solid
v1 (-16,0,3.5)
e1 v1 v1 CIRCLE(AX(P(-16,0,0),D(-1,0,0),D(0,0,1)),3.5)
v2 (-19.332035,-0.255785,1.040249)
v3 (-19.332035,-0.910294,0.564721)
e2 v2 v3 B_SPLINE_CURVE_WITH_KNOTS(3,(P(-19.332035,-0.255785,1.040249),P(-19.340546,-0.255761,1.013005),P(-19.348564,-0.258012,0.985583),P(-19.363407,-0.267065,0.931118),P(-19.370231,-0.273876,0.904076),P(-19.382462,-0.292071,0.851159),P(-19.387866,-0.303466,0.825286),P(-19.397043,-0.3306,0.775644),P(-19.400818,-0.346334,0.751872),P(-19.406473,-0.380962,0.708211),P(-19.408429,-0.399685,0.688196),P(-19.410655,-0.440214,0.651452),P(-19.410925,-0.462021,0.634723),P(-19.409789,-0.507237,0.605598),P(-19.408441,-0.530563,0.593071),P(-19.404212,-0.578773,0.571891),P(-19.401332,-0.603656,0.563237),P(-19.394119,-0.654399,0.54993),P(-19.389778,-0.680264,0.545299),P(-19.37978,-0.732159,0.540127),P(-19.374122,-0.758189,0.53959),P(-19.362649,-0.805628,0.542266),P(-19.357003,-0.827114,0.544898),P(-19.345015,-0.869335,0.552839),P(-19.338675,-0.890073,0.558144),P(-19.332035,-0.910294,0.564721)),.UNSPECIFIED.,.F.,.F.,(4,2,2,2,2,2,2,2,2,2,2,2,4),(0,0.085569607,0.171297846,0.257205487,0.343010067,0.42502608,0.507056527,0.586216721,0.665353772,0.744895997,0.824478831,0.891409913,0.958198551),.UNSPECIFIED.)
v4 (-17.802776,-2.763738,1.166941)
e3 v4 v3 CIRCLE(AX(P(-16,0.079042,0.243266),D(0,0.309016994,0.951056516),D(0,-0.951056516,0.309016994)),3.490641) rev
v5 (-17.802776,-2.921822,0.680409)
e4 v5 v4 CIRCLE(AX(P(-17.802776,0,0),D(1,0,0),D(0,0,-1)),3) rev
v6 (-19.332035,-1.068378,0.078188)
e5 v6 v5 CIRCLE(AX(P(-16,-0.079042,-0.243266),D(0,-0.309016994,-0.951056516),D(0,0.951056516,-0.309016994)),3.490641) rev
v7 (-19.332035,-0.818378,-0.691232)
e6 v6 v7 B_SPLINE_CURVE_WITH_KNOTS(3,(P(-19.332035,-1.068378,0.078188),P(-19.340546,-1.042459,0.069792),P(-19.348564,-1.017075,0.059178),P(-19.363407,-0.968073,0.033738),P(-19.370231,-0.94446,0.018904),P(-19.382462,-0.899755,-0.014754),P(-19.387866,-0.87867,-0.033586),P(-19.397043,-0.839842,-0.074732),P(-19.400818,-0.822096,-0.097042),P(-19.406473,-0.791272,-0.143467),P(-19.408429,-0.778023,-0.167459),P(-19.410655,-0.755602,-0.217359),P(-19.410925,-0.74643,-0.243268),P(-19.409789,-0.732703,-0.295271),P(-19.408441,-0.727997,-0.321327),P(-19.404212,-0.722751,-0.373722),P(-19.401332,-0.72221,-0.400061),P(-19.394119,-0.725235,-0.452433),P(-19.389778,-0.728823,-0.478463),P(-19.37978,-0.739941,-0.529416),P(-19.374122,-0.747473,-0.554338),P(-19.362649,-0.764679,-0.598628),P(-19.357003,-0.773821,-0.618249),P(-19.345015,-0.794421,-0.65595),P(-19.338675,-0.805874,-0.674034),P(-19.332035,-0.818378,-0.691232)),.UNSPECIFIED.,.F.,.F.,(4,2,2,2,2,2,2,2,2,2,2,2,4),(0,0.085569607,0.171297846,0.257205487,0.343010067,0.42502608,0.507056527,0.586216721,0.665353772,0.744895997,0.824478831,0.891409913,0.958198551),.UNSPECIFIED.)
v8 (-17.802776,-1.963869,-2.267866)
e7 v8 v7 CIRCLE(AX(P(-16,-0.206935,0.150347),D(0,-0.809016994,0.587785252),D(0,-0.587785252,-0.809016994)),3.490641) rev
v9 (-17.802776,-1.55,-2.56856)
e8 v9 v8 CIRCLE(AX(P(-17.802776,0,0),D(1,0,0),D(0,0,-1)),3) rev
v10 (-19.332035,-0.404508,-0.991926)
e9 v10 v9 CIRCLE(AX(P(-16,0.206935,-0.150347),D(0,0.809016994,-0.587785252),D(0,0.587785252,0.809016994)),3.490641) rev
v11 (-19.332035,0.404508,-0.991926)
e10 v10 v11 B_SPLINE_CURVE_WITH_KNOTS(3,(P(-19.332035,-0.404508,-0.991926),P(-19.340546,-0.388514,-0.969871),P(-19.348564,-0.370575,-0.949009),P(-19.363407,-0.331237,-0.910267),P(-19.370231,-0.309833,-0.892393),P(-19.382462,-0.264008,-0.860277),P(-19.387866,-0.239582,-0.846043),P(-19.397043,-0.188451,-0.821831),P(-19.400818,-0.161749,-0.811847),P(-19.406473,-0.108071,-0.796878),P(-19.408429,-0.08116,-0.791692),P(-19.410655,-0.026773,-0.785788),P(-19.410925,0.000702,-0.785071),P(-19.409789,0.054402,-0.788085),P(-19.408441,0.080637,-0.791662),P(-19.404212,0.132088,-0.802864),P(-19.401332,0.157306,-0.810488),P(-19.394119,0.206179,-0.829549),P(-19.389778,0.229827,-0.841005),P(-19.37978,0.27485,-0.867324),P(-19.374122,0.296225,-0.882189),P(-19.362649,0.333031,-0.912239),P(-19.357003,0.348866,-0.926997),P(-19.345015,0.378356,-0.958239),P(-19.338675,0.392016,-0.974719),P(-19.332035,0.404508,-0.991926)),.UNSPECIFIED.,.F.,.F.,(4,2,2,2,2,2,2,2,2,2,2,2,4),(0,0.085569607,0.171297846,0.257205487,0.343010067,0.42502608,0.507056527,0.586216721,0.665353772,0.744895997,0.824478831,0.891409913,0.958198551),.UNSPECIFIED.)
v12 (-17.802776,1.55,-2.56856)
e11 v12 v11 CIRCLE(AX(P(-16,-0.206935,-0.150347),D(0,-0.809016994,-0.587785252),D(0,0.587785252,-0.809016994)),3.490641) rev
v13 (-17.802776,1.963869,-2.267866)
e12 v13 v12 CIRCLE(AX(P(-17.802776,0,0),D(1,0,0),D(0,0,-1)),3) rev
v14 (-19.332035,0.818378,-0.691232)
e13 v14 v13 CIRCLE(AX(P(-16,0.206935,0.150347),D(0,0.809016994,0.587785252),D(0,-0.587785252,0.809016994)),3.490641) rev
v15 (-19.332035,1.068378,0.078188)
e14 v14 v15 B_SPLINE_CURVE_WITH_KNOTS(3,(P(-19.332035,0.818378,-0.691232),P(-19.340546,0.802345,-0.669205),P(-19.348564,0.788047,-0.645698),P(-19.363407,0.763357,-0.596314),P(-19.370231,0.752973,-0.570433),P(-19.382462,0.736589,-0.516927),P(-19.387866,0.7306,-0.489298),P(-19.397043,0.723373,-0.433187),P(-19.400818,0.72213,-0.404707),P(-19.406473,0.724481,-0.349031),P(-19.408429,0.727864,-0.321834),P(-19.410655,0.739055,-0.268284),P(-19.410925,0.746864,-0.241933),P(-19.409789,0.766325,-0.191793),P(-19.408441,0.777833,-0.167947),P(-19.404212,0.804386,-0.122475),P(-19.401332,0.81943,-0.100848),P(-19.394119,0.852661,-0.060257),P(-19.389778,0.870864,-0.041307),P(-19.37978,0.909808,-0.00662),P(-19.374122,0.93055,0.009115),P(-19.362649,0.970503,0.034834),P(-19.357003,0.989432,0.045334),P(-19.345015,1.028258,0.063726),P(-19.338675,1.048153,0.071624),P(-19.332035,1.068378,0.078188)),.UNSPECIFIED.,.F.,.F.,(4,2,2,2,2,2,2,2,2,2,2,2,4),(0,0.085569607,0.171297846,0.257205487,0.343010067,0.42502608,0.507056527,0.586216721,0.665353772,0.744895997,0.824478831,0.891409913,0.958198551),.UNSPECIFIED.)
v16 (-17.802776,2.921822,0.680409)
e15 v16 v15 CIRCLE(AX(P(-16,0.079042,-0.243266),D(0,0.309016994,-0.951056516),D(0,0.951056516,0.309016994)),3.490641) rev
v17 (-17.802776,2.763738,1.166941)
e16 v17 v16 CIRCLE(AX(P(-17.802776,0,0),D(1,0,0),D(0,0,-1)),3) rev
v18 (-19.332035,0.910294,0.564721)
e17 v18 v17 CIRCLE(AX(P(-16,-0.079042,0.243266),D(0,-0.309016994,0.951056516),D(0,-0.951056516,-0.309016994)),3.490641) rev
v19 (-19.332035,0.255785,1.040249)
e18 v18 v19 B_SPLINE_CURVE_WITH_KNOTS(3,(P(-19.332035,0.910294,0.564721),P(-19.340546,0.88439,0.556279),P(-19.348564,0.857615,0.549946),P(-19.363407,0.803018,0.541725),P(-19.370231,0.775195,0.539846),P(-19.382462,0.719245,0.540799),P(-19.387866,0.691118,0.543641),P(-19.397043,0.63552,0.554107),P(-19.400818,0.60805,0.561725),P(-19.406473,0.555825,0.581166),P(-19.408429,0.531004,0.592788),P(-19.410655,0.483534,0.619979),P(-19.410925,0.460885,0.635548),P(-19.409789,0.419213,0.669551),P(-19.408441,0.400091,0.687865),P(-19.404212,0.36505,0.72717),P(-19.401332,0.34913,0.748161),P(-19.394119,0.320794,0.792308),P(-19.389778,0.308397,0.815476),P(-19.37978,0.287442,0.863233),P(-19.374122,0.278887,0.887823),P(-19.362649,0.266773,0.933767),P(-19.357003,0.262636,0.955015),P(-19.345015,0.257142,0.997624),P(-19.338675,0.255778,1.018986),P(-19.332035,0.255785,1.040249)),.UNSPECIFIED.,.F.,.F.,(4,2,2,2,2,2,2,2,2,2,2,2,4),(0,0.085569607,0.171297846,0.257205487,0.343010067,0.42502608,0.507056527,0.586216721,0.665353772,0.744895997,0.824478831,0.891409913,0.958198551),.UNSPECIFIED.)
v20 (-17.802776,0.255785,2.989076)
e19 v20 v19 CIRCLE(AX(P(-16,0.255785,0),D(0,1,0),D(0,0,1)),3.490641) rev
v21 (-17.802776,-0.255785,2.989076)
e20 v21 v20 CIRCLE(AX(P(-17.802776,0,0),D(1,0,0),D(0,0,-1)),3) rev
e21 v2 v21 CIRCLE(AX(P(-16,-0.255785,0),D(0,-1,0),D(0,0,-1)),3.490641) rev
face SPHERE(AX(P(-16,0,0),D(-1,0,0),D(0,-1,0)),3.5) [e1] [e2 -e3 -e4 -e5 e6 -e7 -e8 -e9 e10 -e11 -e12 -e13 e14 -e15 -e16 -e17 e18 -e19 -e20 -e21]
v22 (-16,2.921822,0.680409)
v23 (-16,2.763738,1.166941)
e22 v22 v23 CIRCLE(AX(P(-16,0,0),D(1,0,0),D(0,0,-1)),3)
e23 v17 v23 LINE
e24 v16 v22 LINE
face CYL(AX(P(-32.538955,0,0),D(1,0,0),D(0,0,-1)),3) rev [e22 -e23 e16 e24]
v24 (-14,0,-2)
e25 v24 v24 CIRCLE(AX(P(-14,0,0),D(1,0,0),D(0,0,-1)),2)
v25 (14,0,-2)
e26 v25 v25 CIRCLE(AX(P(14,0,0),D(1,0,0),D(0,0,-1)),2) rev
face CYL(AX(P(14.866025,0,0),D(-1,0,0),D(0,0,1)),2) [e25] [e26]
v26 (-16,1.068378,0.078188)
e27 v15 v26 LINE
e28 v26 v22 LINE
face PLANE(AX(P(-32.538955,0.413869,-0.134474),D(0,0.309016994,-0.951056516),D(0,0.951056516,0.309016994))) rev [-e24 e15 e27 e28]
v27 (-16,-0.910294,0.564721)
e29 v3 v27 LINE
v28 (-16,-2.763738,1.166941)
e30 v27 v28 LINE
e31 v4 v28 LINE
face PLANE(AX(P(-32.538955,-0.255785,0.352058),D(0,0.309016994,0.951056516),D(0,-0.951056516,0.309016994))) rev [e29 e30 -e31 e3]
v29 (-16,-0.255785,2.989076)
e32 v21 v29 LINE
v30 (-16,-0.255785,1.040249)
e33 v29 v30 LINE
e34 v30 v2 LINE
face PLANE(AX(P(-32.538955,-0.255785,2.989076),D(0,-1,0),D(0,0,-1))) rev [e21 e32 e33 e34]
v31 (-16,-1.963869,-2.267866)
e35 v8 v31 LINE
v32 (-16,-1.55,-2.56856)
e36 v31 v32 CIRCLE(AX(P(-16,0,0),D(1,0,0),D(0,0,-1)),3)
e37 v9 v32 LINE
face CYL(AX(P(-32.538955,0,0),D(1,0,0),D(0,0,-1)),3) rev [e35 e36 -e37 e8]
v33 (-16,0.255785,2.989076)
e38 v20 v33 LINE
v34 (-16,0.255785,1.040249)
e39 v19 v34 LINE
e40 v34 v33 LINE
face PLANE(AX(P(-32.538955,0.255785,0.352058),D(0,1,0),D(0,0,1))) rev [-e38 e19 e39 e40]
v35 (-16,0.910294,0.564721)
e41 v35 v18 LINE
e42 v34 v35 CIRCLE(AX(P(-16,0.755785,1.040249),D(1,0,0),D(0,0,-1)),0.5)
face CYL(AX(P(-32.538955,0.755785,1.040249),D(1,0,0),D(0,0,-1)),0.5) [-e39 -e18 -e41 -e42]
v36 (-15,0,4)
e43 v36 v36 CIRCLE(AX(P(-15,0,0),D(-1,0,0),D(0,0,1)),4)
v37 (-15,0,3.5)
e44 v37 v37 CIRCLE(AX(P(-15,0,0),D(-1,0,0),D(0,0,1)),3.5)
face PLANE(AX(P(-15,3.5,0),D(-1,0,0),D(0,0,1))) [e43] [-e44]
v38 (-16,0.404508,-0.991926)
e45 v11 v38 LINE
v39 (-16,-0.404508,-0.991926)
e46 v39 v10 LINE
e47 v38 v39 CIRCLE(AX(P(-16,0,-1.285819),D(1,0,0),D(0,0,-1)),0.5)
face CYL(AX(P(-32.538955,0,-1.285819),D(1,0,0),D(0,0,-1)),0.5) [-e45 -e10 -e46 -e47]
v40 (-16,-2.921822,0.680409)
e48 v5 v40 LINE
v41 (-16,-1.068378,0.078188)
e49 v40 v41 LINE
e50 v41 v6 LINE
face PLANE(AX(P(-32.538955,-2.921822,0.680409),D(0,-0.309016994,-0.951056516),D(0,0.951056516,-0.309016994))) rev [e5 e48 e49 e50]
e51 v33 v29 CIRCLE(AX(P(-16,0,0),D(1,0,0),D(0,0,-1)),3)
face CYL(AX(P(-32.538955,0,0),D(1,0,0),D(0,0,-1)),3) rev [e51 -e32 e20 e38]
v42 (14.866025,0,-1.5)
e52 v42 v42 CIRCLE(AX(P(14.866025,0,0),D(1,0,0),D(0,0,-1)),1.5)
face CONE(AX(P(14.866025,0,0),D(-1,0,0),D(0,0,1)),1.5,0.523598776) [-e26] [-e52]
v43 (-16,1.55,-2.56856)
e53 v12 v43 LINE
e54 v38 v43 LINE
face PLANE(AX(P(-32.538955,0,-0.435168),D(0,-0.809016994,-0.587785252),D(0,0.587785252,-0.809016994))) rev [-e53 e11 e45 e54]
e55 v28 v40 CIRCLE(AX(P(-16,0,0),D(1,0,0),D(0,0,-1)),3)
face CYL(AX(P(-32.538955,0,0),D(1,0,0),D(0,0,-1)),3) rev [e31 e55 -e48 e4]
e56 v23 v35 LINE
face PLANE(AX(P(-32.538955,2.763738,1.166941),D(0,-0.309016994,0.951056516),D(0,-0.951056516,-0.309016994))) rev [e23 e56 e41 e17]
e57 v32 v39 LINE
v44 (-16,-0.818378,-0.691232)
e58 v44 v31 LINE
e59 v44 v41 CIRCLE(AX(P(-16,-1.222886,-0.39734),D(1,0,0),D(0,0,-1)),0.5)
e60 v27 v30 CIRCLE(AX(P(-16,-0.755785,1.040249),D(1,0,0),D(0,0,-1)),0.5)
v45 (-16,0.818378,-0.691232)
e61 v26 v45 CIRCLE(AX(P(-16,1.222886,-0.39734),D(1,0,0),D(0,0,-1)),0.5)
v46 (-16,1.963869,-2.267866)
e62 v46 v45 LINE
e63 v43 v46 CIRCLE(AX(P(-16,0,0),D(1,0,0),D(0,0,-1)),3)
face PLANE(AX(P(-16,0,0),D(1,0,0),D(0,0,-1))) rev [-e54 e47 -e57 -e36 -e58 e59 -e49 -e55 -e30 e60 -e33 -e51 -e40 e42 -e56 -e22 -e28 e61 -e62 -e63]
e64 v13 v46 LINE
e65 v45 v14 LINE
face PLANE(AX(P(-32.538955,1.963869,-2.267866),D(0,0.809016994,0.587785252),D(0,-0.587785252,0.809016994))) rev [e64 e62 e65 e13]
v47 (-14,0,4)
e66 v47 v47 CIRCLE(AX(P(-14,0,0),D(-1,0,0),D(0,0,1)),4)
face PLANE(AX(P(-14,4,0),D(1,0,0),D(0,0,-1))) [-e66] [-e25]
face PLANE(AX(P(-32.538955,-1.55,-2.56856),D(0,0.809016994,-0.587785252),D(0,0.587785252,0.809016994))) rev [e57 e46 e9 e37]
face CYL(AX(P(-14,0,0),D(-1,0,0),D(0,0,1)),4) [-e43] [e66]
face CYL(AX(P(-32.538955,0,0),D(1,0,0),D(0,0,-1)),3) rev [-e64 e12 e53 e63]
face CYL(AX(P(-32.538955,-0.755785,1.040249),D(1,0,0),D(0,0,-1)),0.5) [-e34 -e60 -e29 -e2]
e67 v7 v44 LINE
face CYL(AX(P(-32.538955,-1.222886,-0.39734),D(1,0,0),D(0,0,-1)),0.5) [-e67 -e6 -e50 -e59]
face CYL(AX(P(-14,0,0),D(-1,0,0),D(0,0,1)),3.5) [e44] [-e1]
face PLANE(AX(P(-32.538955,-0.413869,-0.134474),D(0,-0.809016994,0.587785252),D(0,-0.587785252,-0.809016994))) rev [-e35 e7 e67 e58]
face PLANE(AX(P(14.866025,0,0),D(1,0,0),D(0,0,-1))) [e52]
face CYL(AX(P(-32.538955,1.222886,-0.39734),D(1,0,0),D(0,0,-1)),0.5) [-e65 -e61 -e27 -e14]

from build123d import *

# Parameters (mm, degrees)
SKETCH2_R               = 2
BOSS_EXTRUDE1_DEPTH     = 28.866025404
CUT_EXTRUDE1_REACH      = 33.38
CUT_EXTRUDE1_END_RADIUS = 3.5
CHAMFER1_SIZE           = 0.5
CHAMFER1_SIZE2          = 0.866025404
FILLET1_R               = 0.5


with BuildPart() as part:
    # Sketch1 → Revolve1 (revolve)
    with BuildSketch(Plane(origin=(0, 0, 0), x_dir=(-1, 0, 0), z_dir=(0, 0, -1)), mode=Mode.PRIVATE) as revolve1_sk:
        with BuildLine():
            Line((14, 4), (14, 0))
            Line((14, 0), (19.5, 0))
            ThreePointArc((19.5, 0), (18.474873734, 2.474873734), (16, 3.5))
            Line((16, 3.5), (15, 3.5))
            Line((15, 3.5), (15, 4))
            Line((15, 4), (14, 4))
        make_face()
    revolve(revolve1_sk.sketch.rotate(Axis((-14, 0, 0), (-1, 0, 0)), 270), axis=Axis((-14, 0, 0), (-1, 0, 0)))

    # Sketch2 → Boss-Extrude1 (add)
    with BuildSketch(Plane(origin=(-14, 0, 0), x_dir=(0, 0, -1), z_dir=(1, 0, 0))):
        Circle(SKETCH2_R)
    extrude(amount=BOSS_EXTRUDE1_DEPTH)

    # Cut-Extrude1: up to this sphere (the profile starts inside it)
    cut_extrude1_end = Location((-16, 0, 0)) * Sphere(CUT_EXTRUDE1_END_RADIUS, mode=Mode.PRIVATE)
    # Sketch3 → Cut-Extrude1 (cut, up to the surface)
    with BuildSketch(Plane(origin=(-16, 0, 0), x_dir=(0, 0, -1), z_dir=(1, 0, 0)), mode=Mode.PRIVATE) as cut_extrude1_sk1:
        with BuildLine():
            Line((2.267866263, 1.963869297), (0.134474286, 0.413869297))
            Line((0.134474286, 0.413869297), (-0.680408938, 2.921821979))
            ThreePointArc((-0.680408938, 2.921821979), (-0.927050983, 2.853169549), (-1.166941475, 2.763737975))
            Line((-1.166941475, 2.763737975), (-0.352058252, 0.255785292))
            Line((-0.352058252, 0.255785292), (-2.989075758, 0.255785292))
            ThreePointArc((-2.989075758, 0.255785292), (-3, 0), (-2.989075758, -0.255785292))
            Line((-2.989075758, -0.255785292), (-0.352058252, -0.255785292))
            Line((-0.352058252, -0.255785292), (-1.166941475, -2.763737975))
            ThreePointArc((-1.166941475, -2.763737975), (-0.927050983, -2.853169549), (-0.680408938, -2.921821979))
            Line((-0.680408938, -2.921821979), (0.134474286, -0.413869297))
            Line((0.134474286, -0.413869297), (2.267866263, -1.963869297))
            ThreePointArc((2.267866263, -1.963869297), (2.427050983, -1.763355757), (2.568559908, -1.55))
            Line((2.568559908, -1.55), (0.435167931, 0))
            Line((0.435167931, 0), (2.568559908, 1.55))
            ThreePointArc((2.568559908, 1.55), (2.427050983, 1.763355757), (2.267866263, 1.963869297))
        make_face()
    cut_extrude1_tool1 = extrude(cut_extrude1_sk1.sketch, amount=-CUT_EXTRUDE1_REACH, mode=Mode.PRIVATE) & cut_extrude1_end
    add(cut_extrude1_tool1.solids().sort_by_distance((-16, 0, 0))[0], mode=Mode.SUBTRACT)

    # Chamfer1
    chamfer1_edges = [part.edges().sort_by_distance(p)[0] for p in [
        (14.866025404, 0, 2),
    ]]
    chamfer1_side = [part.faces().sort_by_distance(p)[0] for p in [
        (14.866025404, 0, 0),
    ]]
    chamfer(chamfer1_edges, length=CHAMFER1_SIZE, length2=CHAMFER1_SIZE2, reference=chamfer1_side[0])

    # Fillet1
    # the kernel refuses this fillet: 0.5 mm, written as the material it takes off along each edge
    with BuildSketch(Plane(origin=(-16, 0, -0.435167931), x_dir=(0, -0.5877852522924764, -0.8090169943749451), z_dir=(-1, 0, 0)), Plane(origin=(-16, -0.413869297, -0.134474286), x_dir=(0, -0.9510565162951523, 0.3090169943749514), z_dir=(-1, 0, 0)), Plane(origin=(-16, -0.255785292, 0.352058252), x_dir=(0, 0, 1), z_dir=(-1, 0, 0)), Plane(origin=(-16, 0.255785292, 0.352058252), x_dir=(0, 0.9510565162951548, 0.3090169943749436), z_dir=(-1, 0, 0)), Plane(origin=(-16, 0.413869297, -0.134474286), x_dir=(0, 0.5877852522924701, -0.8090169943749497), z_dir=(-1, 0, 0))) as fillet1_piece_1:
        with BuildLine():
            CenterArc((FILLET1_R * 1.37638192047, -FILLET1_R), FILLET1_R, 90, 108)
            Line((FILLET1_R * 0.425325404176, -FILLET1_R * 1.30901699437), (0, 0))
            Line((0, 0), (FILLET1_R * 1.37638192047, 0))
        make_face()
    extrude(amount=5.193319014, mode=Mode.SUBTRACT)


solid = part.part
